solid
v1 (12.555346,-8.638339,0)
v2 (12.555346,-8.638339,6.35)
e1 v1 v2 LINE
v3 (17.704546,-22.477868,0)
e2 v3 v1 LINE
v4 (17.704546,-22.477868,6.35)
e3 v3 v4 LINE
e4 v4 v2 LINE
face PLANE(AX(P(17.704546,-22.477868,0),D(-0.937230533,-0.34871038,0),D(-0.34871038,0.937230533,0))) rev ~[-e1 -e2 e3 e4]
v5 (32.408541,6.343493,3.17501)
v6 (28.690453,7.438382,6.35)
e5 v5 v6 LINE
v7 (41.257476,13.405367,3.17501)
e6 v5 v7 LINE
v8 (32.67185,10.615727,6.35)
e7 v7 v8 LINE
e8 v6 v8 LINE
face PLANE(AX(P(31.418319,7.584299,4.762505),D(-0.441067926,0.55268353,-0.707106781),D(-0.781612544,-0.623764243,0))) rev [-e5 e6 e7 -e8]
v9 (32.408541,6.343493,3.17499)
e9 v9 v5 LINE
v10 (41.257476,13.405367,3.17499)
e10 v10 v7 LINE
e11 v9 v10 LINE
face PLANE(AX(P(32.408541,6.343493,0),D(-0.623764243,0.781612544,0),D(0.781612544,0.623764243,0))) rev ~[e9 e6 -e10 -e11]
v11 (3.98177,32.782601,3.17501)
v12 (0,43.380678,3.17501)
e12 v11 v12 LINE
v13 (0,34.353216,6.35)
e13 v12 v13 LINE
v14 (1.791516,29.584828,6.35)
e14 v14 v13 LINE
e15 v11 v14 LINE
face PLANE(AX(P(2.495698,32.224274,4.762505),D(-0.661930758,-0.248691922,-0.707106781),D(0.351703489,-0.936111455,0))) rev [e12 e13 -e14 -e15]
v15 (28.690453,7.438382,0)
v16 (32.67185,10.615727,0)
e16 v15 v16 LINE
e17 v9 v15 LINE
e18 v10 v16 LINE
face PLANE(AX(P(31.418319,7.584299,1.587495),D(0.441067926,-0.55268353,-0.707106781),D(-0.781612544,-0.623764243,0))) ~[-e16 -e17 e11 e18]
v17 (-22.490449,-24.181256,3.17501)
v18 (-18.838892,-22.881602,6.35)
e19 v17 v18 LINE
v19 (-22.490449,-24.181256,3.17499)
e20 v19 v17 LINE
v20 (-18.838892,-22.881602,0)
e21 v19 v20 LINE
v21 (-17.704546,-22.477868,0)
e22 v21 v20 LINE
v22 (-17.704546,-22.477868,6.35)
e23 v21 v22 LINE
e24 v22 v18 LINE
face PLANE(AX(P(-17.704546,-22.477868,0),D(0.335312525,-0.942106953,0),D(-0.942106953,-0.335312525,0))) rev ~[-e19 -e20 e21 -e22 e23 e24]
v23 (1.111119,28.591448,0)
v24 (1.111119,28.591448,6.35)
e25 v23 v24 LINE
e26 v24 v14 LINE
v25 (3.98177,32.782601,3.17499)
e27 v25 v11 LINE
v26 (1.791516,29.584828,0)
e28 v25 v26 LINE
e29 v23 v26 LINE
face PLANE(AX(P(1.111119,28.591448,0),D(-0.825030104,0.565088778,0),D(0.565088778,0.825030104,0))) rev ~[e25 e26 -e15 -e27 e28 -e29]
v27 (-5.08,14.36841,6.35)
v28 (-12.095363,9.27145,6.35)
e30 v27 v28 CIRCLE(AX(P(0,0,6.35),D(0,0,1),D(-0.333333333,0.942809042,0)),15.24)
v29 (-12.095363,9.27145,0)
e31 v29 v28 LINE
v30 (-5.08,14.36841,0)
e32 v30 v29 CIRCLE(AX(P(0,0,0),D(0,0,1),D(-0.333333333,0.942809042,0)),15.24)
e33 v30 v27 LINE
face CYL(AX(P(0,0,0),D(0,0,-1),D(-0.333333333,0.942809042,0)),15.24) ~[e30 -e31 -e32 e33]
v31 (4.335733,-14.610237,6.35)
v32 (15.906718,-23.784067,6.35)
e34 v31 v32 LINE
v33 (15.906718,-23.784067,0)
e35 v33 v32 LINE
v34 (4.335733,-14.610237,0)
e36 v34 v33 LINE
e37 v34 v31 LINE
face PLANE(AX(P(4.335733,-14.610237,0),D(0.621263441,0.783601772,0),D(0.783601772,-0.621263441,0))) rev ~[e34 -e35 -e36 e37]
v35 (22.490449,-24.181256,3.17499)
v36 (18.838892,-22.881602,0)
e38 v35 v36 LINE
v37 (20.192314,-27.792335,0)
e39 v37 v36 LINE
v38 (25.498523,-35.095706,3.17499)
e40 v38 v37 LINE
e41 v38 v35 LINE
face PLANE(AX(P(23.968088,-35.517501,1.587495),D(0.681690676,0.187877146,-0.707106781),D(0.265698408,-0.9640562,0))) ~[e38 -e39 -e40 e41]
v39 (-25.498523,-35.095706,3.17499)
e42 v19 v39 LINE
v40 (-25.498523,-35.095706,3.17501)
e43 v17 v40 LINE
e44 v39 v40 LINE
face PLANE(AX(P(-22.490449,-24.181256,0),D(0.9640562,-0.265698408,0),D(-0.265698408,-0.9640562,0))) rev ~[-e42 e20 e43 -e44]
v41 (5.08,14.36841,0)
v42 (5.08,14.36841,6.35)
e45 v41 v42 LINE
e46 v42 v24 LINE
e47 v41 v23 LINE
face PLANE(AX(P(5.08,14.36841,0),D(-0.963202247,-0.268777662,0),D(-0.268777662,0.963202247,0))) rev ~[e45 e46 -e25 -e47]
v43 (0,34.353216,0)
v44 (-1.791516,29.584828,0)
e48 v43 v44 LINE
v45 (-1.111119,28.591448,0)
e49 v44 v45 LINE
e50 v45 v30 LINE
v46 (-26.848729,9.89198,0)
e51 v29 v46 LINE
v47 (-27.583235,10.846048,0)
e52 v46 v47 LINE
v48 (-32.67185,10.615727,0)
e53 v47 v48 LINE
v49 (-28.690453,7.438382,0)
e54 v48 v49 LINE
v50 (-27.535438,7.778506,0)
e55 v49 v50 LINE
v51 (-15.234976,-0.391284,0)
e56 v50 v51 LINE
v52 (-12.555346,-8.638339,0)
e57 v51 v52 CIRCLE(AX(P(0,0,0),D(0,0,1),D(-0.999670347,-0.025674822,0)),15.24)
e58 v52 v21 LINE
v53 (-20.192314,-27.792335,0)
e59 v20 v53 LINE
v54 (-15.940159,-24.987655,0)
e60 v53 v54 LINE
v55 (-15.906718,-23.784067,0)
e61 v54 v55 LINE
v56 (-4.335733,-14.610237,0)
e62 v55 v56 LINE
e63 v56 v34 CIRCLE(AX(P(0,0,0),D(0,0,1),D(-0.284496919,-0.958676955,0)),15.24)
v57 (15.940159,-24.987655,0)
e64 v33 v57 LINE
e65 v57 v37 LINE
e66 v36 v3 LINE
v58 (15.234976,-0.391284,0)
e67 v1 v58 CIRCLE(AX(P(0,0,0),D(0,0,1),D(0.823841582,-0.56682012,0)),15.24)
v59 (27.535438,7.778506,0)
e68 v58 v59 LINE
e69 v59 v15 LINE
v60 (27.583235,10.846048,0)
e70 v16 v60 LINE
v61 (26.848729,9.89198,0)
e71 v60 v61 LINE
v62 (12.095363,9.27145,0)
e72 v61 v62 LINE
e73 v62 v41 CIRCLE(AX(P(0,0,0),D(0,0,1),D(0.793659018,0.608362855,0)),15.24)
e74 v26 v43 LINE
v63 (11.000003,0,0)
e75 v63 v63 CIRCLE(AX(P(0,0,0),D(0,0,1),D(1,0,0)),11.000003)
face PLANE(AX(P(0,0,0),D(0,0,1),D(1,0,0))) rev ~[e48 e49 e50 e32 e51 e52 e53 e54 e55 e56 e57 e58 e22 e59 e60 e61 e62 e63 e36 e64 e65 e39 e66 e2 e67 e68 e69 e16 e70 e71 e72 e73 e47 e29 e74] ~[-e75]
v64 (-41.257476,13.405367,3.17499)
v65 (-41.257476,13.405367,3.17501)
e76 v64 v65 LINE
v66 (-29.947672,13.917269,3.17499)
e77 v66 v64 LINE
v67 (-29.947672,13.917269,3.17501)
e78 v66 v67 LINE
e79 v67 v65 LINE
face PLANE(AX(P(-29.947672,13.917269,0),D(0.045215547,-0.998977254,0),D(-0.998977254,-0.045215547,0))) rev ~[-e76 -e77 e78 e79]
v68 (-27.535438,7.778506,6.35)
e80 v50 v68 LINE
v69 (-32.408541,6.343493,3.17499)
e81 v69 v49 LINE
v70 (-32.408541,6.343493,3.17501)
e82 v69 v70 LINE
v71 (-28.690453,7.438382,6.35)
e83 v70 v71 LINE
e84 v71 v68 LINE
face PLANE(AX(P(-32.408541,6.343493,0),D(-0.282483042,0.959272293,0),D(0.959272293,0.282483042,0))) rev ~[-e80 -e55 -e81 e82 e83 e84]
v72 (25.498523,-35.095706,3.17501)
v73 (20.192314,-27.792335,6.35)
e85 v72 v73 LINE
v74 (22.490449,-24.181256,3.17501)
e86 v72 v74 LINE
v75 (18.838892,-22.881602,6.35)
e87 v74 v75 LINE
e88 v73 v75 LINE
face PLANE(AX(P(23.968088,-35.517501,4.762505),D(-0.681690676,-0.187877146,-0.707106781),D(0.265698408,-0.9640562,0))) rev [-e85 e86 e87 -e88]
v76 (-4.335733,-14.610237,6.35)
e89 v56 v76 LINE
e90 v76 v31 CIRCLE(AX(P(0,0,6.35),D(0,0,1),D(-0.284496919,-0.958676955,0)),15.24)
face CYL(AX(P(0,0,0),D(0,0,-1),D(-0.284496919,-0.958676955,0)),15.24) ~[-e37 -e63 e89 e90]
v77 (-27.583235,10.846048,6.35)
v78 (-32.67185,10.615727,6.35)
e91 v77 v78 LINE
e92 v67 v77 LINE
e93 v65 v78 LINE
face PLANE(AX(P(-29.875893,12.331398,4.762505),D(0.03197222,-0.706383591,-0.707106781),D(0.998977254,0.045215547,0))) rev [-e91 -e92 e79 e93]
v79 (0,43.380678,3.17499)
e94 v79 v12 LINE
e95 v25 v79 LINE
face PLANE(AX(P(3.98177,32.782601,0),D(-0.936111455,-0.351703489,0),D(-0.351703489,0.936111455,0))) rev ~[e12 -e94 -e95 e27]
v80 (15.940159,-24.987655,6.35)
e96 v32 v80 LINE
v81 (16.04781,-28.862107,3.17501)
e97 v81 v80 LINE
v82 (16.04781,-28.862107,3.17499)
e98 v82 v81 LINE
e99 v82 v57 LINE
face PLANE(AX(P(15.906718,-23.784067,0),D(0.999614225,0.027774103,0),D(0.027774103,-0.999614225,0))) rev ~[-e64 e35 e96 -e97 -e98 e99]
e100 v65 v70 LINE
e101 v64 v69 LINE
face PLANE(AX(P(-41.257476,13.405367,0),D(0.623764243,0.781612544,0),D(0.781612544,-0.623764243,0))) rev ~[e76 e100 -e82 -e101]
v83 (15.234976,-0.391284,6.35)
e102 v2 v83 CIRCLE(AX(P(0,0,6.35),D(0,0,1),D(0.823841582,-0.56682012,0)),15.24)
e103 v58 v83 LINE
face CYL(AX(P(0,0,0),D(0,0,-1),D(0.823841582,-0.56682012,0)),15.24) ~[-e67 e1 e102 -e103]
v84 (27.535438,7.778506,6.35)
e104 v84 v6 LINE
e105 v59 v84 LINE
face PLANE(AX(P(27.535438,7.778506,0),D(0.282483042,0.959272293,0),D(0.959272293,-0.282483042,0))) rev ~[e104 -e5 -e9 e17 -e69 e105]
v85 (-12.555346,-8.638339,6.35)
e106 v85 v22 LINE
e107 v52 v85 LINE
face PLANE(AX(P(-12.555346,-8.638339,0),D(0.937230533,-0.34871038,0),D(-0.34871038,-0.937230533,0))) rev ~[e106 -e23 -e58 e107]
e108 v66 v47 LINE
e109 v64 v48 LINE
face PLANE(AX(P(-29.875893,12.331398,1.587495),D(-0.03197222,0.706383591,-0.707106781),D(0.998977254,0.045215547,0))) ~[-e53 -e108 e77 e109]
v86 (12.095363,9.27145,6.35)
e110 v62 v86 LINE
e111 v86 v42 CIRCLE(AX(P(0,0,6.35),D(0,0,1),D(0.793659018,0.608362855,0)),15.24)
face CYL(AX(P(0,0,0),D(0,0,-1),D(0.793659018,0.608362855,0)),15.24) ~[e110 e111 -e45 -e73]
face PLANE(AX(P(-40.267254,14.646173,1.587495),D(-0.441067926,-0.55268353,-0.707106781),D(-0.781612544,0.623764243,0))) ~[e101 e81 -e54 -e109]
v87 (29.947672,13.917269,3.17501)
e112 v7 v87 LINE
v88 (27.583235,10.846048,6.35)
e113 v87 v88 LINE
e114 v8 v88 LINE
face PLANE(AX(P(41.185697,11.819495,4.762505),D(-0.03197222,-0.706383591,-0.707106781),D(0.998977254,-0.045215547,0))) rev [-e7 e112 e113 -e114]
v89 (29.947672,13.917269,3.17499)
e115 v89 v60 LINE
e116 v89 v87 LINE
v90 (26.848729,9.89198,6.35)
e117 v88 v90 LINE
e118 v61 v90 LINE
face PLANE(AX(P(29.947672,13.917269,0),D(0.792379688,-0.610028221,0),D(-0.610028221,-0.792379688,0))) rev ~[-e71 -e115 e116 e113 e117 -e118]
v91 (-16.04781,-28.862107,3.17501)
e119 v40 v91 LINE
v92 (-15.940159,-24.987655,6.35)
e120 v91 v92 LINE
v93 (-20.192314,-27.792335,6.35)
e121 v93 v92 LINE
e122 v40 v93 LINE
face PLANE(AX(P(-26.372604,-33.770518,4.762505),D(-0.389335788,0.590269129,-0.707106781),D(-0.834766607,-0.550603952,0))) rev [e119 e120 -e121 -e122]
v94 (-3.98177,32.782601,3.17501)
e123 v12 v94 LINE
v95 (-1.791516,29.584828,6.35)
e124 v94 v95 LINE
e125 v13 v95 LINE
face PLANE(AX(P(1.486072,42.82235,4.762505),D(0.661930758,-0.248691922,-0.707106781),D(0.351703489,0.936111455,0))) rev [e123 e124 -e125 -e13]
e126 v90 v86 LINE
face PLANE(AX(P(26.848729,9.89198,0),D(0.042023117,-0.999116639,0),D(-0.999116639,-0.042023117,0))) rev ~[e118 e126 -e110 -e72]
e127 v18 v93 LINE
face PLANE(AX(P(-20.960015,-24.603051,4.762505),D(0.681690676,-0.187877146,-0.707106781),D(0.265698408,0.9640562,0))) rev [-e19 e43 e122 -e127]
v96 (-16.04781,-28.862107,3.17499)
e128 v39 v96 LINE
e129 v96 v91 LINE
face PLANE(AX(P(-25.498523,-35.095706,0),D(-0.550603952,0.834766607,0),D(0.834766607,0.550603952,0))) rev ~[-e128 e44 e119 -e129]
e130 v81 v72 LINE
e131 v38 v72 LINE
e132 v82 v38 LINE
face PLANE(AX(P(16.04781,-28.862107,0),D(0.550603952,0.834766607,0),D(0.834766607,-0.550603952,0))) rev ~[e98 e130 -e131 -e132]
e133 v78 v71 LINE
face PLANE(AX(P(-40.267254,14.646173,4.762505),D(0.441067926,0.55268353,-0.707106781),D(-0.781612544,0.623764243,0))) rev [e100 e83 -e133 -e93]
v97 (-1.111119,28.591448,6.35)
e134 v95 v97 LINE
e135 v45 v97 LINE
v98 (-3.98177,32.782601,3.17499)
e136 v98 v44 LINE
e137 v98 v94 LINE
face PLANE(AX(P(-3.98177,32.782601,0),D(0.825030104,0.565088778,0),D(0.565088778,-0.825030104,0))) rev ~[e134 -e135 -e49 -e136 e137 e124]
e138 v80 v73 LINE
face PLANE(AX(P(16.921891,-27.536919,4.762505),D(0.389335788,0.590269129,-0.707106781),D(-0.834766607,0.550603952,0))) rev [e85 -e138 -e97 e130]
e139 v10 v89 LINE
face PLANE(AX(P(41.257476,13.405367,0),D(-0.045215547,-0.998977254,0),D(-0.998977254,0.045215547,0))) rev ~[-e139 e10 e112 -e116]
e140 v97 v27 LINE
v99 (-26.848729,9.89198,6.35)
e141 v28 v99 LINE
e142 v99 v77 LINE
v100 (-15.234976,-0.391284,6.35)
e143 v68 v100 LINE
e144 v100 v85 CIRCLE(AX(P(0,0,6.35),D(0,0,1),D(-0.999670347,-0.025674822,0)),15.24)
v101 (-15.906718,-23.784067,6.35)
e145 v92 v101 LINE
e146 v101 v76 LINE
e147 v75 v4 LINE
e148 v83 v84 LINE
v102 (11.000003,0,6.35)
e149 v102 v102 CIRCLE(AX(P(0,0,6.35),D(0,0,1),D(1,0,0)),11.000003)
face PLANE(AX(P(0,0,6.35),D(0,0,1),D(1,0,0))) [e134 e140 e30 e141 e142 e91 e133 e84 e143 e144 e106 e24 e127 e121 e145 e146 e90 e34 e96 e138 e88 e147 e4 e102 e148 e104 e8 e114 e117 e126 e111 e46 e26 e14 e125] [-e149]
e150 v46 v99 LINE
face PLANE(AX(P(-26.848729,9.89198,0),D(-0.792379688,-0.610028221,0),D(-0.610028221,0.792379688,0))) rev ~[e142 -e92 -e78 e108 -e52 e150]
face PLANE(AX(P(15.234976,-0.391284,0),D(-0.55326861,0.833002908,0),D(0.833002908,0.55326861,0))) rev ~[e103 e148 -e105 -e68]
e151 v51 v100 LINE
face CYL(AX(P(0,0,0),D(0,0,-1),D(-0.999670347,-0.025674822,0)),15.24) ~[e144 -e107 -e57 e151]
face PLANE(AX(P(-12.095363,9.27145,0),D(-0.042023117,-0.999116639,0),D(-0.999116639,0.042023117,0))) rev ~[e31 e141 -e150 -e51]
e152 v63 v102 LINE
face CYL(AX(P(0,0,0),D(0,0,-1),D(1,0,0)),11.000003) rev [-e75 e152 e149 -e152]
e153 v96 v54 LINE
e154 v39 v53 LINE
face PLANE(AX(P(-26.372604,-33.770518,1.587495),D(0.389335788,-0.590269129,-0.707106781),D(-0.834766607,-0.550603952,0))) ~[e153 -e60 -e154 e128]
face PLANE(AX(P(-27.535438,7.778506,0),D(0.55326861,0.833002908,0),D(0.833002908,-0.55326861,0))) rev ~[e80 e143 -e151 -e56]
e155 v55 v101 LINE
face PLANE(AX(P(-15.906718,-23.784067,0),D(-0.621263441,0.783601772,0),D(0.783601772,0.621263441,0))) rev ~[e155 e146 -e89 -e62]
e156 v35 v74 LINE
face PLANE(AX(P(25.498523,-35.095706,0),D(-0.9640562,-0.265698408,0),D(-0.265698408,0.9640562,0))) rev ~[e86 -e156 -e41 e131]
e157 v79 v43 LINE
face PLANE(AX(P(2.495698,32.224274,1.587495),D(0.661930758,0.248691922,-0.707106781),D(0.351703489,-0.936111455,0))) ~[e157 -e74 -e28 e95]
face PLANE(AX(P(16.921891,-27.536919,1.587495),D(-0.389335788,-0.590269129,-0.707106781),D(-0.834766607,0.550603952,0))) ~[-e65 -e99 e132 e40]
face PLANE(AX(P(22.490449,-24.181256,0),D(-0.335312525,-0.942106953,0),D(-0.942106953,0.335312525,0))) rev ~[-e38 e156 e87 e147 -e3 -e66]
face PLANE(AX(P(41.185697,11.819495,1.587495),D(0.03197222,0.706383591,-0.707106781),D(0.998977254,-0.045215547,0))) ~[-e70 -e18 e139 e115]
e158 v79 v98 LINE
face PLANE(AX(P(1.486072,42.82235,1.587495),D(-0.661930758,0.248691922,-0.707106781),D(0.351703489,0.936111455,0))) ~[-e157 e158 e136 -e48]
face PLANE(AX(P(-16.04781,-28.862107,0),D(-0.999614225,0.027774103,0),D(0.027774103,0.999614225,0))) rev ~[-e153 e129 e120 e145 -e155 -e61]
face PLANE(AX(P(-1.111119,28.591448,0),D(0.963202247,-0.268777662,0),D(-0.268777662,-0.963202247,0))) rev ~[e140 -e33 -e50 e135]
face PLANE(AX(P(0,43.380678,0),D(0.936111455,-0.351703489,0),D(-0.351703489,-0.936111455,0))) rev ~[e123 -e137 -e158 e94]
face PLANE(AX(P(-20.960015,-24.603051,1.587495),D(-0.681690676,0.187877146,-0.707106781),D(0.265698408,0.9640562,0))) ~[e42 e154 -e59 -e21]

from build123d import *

# Parameters (mm, degrees)
F0_R     = 11.0000034
F1_DEPTH = 6.35
F2_SIZE  = 3.17499


# Not quite as in the source:
# - a fillet or chamfer is up to 0.001 mm smaller than in the source, because OpenCascade refuses the exact size


with BuildPart() as f1:
    # F0 (on Top) → F1 (new body)
    with BuildSketch(Plane.XY):
        with BuildLine():
            Line((-1.1111190304, 28.591448421), (-5.08, 14.3684097937))
            ThreePointArc((-5.08, 14.3684097937), (-8.9578472449, 12.3294189943), (-12.0953634317, 9.2714499112))
            Line((-12.0953634317, 9.2714499112), (-26.8487286679, 9.8919804501))
            Line((-26.8487286679, 9.8919804501), (-29.9476720311, 13.9172692636))
            Line((-29.9476720311, 13.9172692636), (-41.2574764774, 13.4053667244))
            Line((-41.2574764774, 13.4053667244), (-32.4085412404, 6.3434926108))
            Line((-32.4085412404, 6.3434926108), (-27.5354379943, 7.7785064617))
            Line((-27.5354379943, 7.7785064617), (-15.2349760945, -0.3912842944))
            ThreePointArc((-15.2349760945, -0.3912842944), (-14.4941013083, -4.7094189943), (-12.5553457071, -8.6383386236))
            Line((-12.5553457071, -8.6383386236), (-17.7045459019, -22.4778682868))
            Line((-17.7045459019, -22.4778682868), (-22.4904492218, -24.1812559153))
            Line((-22.4904492218, -24.1812559153), (-25.4985227531, -35.0957057161))
            Line((-25.4985227531, -35.0957057161), (-16.0478099898, -28.8621073099))
            Line((-16.0478099898, -28.8621073099), (-15.9067175452, -23.784067046))
            Line((-15.9067175452, -23.784067046), (-4.3357330442, -14.6102367869))
            ThreePointArc((-4.3357330442, -14.6102367869), (0, -15.24), (4.3357330442, -14.6102367869))
            Line((4.3357330442, -14.6102367869), (15.9067175452, -23.784067046))
            Line((15.9067175452, -23.784067046), (16.0478099898, -28.8621073099))
            Line((16.0478099898, -28.8621073099), (25.4985227531, -35.0957057161))
            Line((25.4985227531, -35.0957057161), (22.4904492218, -24.1812559153))
            Line((22.4904492218, -24.1812559153), (17.7045459019, -22.4778682868))
            Line((17.7045459019, -22.4778682868), (12.5553457071, -8.6383386236))
            ThreePointArc((12.5553457071, -8.6383386236), (14.4941013083, -4.7094189943), (15.2349760945, -0.3912842944))
            Line((15.2349760945, -0.3912842944), (27.5354379943, 7.7785064617))
            Line((27.5354379943, 7.7785064617), (32.4085412404, 6.3434926108))
            Line((32.4085412404, 6.3434926108), (41.2574764774, 13.4053667244))
            Line((41.2574764774, 13.4053667244), (29.9476720311, 13.9172692636))
            Line((29.9476720311, 13.9172692636), (26.8487286679, 9.8919804501))
            Line((26.8487286679, 9.8919804501), (12.0953634317, 9.2714499112))
            ThreePointArc((12.0953634317, 9.2714499112), (8.9578472449, 12.3294189943), (5.08, 14.3684097937))
            Line((5.08, 14.3684097937), (1.1111190304, 28.591448421))
            Line((1.1111190304, 28.591448421), (3.9817700226, 32.7826013508))
            Line((3.9817700226, 32.7826013508), (0, 43.3806779834))
            Line((0, 43.3806779834), (-3.9817700226, 32.7826013508))
            Line((-3.9817700226, 32.7826013508), (-1.1111190304, 28.591448421))
        make_face()
        Circle(F0_R, mode=Mode.SUBTRACT)
    extrude(amount=F1_DEPTH)

    # F2 (size 3.175 in the source; OpenCascade refuses exactly that, so slightly less here)
    f2_edges = [f1.edges().sort_by_distance(p)[0] for p in [
        (35.602574, 13.661318, 6.35),
        (35.602574, 13.661318, 0),
        (36.833009, 9.87443, 6.35),
        (36.833009, 9.87443, 0),
        (1.990885, 38.08164, 6.35),
        (1.990885, 38.08164, 0),
        (23.994486, -29.638481, 6.35),
        (23.994486, -29.638481, 0),
        (-35.602574, 13.661318, 6.35),
        (-35.602574, 13.661318, 0),
        (-1.990885, 38.08164, 6.35),
        (-1.990885, 38.08164, 0),
        (-23.994486, -29.638481, 6.35),
        (-23.994486, -29.638481, 0),
        (-36.833009, 9.87443, 6.35),
        (-36.833009, 9.87443, 0),
        (-20.773166, -31.978907, 6.35),
        (-20.773166, -31.978907, 0),
        (20.773166, -31.978907, 6.35),
        (20.773166, -31.978907, 0),
    ]]
    chamfer(f2_edges, length=F2_SIZE)


solid = f1.part
